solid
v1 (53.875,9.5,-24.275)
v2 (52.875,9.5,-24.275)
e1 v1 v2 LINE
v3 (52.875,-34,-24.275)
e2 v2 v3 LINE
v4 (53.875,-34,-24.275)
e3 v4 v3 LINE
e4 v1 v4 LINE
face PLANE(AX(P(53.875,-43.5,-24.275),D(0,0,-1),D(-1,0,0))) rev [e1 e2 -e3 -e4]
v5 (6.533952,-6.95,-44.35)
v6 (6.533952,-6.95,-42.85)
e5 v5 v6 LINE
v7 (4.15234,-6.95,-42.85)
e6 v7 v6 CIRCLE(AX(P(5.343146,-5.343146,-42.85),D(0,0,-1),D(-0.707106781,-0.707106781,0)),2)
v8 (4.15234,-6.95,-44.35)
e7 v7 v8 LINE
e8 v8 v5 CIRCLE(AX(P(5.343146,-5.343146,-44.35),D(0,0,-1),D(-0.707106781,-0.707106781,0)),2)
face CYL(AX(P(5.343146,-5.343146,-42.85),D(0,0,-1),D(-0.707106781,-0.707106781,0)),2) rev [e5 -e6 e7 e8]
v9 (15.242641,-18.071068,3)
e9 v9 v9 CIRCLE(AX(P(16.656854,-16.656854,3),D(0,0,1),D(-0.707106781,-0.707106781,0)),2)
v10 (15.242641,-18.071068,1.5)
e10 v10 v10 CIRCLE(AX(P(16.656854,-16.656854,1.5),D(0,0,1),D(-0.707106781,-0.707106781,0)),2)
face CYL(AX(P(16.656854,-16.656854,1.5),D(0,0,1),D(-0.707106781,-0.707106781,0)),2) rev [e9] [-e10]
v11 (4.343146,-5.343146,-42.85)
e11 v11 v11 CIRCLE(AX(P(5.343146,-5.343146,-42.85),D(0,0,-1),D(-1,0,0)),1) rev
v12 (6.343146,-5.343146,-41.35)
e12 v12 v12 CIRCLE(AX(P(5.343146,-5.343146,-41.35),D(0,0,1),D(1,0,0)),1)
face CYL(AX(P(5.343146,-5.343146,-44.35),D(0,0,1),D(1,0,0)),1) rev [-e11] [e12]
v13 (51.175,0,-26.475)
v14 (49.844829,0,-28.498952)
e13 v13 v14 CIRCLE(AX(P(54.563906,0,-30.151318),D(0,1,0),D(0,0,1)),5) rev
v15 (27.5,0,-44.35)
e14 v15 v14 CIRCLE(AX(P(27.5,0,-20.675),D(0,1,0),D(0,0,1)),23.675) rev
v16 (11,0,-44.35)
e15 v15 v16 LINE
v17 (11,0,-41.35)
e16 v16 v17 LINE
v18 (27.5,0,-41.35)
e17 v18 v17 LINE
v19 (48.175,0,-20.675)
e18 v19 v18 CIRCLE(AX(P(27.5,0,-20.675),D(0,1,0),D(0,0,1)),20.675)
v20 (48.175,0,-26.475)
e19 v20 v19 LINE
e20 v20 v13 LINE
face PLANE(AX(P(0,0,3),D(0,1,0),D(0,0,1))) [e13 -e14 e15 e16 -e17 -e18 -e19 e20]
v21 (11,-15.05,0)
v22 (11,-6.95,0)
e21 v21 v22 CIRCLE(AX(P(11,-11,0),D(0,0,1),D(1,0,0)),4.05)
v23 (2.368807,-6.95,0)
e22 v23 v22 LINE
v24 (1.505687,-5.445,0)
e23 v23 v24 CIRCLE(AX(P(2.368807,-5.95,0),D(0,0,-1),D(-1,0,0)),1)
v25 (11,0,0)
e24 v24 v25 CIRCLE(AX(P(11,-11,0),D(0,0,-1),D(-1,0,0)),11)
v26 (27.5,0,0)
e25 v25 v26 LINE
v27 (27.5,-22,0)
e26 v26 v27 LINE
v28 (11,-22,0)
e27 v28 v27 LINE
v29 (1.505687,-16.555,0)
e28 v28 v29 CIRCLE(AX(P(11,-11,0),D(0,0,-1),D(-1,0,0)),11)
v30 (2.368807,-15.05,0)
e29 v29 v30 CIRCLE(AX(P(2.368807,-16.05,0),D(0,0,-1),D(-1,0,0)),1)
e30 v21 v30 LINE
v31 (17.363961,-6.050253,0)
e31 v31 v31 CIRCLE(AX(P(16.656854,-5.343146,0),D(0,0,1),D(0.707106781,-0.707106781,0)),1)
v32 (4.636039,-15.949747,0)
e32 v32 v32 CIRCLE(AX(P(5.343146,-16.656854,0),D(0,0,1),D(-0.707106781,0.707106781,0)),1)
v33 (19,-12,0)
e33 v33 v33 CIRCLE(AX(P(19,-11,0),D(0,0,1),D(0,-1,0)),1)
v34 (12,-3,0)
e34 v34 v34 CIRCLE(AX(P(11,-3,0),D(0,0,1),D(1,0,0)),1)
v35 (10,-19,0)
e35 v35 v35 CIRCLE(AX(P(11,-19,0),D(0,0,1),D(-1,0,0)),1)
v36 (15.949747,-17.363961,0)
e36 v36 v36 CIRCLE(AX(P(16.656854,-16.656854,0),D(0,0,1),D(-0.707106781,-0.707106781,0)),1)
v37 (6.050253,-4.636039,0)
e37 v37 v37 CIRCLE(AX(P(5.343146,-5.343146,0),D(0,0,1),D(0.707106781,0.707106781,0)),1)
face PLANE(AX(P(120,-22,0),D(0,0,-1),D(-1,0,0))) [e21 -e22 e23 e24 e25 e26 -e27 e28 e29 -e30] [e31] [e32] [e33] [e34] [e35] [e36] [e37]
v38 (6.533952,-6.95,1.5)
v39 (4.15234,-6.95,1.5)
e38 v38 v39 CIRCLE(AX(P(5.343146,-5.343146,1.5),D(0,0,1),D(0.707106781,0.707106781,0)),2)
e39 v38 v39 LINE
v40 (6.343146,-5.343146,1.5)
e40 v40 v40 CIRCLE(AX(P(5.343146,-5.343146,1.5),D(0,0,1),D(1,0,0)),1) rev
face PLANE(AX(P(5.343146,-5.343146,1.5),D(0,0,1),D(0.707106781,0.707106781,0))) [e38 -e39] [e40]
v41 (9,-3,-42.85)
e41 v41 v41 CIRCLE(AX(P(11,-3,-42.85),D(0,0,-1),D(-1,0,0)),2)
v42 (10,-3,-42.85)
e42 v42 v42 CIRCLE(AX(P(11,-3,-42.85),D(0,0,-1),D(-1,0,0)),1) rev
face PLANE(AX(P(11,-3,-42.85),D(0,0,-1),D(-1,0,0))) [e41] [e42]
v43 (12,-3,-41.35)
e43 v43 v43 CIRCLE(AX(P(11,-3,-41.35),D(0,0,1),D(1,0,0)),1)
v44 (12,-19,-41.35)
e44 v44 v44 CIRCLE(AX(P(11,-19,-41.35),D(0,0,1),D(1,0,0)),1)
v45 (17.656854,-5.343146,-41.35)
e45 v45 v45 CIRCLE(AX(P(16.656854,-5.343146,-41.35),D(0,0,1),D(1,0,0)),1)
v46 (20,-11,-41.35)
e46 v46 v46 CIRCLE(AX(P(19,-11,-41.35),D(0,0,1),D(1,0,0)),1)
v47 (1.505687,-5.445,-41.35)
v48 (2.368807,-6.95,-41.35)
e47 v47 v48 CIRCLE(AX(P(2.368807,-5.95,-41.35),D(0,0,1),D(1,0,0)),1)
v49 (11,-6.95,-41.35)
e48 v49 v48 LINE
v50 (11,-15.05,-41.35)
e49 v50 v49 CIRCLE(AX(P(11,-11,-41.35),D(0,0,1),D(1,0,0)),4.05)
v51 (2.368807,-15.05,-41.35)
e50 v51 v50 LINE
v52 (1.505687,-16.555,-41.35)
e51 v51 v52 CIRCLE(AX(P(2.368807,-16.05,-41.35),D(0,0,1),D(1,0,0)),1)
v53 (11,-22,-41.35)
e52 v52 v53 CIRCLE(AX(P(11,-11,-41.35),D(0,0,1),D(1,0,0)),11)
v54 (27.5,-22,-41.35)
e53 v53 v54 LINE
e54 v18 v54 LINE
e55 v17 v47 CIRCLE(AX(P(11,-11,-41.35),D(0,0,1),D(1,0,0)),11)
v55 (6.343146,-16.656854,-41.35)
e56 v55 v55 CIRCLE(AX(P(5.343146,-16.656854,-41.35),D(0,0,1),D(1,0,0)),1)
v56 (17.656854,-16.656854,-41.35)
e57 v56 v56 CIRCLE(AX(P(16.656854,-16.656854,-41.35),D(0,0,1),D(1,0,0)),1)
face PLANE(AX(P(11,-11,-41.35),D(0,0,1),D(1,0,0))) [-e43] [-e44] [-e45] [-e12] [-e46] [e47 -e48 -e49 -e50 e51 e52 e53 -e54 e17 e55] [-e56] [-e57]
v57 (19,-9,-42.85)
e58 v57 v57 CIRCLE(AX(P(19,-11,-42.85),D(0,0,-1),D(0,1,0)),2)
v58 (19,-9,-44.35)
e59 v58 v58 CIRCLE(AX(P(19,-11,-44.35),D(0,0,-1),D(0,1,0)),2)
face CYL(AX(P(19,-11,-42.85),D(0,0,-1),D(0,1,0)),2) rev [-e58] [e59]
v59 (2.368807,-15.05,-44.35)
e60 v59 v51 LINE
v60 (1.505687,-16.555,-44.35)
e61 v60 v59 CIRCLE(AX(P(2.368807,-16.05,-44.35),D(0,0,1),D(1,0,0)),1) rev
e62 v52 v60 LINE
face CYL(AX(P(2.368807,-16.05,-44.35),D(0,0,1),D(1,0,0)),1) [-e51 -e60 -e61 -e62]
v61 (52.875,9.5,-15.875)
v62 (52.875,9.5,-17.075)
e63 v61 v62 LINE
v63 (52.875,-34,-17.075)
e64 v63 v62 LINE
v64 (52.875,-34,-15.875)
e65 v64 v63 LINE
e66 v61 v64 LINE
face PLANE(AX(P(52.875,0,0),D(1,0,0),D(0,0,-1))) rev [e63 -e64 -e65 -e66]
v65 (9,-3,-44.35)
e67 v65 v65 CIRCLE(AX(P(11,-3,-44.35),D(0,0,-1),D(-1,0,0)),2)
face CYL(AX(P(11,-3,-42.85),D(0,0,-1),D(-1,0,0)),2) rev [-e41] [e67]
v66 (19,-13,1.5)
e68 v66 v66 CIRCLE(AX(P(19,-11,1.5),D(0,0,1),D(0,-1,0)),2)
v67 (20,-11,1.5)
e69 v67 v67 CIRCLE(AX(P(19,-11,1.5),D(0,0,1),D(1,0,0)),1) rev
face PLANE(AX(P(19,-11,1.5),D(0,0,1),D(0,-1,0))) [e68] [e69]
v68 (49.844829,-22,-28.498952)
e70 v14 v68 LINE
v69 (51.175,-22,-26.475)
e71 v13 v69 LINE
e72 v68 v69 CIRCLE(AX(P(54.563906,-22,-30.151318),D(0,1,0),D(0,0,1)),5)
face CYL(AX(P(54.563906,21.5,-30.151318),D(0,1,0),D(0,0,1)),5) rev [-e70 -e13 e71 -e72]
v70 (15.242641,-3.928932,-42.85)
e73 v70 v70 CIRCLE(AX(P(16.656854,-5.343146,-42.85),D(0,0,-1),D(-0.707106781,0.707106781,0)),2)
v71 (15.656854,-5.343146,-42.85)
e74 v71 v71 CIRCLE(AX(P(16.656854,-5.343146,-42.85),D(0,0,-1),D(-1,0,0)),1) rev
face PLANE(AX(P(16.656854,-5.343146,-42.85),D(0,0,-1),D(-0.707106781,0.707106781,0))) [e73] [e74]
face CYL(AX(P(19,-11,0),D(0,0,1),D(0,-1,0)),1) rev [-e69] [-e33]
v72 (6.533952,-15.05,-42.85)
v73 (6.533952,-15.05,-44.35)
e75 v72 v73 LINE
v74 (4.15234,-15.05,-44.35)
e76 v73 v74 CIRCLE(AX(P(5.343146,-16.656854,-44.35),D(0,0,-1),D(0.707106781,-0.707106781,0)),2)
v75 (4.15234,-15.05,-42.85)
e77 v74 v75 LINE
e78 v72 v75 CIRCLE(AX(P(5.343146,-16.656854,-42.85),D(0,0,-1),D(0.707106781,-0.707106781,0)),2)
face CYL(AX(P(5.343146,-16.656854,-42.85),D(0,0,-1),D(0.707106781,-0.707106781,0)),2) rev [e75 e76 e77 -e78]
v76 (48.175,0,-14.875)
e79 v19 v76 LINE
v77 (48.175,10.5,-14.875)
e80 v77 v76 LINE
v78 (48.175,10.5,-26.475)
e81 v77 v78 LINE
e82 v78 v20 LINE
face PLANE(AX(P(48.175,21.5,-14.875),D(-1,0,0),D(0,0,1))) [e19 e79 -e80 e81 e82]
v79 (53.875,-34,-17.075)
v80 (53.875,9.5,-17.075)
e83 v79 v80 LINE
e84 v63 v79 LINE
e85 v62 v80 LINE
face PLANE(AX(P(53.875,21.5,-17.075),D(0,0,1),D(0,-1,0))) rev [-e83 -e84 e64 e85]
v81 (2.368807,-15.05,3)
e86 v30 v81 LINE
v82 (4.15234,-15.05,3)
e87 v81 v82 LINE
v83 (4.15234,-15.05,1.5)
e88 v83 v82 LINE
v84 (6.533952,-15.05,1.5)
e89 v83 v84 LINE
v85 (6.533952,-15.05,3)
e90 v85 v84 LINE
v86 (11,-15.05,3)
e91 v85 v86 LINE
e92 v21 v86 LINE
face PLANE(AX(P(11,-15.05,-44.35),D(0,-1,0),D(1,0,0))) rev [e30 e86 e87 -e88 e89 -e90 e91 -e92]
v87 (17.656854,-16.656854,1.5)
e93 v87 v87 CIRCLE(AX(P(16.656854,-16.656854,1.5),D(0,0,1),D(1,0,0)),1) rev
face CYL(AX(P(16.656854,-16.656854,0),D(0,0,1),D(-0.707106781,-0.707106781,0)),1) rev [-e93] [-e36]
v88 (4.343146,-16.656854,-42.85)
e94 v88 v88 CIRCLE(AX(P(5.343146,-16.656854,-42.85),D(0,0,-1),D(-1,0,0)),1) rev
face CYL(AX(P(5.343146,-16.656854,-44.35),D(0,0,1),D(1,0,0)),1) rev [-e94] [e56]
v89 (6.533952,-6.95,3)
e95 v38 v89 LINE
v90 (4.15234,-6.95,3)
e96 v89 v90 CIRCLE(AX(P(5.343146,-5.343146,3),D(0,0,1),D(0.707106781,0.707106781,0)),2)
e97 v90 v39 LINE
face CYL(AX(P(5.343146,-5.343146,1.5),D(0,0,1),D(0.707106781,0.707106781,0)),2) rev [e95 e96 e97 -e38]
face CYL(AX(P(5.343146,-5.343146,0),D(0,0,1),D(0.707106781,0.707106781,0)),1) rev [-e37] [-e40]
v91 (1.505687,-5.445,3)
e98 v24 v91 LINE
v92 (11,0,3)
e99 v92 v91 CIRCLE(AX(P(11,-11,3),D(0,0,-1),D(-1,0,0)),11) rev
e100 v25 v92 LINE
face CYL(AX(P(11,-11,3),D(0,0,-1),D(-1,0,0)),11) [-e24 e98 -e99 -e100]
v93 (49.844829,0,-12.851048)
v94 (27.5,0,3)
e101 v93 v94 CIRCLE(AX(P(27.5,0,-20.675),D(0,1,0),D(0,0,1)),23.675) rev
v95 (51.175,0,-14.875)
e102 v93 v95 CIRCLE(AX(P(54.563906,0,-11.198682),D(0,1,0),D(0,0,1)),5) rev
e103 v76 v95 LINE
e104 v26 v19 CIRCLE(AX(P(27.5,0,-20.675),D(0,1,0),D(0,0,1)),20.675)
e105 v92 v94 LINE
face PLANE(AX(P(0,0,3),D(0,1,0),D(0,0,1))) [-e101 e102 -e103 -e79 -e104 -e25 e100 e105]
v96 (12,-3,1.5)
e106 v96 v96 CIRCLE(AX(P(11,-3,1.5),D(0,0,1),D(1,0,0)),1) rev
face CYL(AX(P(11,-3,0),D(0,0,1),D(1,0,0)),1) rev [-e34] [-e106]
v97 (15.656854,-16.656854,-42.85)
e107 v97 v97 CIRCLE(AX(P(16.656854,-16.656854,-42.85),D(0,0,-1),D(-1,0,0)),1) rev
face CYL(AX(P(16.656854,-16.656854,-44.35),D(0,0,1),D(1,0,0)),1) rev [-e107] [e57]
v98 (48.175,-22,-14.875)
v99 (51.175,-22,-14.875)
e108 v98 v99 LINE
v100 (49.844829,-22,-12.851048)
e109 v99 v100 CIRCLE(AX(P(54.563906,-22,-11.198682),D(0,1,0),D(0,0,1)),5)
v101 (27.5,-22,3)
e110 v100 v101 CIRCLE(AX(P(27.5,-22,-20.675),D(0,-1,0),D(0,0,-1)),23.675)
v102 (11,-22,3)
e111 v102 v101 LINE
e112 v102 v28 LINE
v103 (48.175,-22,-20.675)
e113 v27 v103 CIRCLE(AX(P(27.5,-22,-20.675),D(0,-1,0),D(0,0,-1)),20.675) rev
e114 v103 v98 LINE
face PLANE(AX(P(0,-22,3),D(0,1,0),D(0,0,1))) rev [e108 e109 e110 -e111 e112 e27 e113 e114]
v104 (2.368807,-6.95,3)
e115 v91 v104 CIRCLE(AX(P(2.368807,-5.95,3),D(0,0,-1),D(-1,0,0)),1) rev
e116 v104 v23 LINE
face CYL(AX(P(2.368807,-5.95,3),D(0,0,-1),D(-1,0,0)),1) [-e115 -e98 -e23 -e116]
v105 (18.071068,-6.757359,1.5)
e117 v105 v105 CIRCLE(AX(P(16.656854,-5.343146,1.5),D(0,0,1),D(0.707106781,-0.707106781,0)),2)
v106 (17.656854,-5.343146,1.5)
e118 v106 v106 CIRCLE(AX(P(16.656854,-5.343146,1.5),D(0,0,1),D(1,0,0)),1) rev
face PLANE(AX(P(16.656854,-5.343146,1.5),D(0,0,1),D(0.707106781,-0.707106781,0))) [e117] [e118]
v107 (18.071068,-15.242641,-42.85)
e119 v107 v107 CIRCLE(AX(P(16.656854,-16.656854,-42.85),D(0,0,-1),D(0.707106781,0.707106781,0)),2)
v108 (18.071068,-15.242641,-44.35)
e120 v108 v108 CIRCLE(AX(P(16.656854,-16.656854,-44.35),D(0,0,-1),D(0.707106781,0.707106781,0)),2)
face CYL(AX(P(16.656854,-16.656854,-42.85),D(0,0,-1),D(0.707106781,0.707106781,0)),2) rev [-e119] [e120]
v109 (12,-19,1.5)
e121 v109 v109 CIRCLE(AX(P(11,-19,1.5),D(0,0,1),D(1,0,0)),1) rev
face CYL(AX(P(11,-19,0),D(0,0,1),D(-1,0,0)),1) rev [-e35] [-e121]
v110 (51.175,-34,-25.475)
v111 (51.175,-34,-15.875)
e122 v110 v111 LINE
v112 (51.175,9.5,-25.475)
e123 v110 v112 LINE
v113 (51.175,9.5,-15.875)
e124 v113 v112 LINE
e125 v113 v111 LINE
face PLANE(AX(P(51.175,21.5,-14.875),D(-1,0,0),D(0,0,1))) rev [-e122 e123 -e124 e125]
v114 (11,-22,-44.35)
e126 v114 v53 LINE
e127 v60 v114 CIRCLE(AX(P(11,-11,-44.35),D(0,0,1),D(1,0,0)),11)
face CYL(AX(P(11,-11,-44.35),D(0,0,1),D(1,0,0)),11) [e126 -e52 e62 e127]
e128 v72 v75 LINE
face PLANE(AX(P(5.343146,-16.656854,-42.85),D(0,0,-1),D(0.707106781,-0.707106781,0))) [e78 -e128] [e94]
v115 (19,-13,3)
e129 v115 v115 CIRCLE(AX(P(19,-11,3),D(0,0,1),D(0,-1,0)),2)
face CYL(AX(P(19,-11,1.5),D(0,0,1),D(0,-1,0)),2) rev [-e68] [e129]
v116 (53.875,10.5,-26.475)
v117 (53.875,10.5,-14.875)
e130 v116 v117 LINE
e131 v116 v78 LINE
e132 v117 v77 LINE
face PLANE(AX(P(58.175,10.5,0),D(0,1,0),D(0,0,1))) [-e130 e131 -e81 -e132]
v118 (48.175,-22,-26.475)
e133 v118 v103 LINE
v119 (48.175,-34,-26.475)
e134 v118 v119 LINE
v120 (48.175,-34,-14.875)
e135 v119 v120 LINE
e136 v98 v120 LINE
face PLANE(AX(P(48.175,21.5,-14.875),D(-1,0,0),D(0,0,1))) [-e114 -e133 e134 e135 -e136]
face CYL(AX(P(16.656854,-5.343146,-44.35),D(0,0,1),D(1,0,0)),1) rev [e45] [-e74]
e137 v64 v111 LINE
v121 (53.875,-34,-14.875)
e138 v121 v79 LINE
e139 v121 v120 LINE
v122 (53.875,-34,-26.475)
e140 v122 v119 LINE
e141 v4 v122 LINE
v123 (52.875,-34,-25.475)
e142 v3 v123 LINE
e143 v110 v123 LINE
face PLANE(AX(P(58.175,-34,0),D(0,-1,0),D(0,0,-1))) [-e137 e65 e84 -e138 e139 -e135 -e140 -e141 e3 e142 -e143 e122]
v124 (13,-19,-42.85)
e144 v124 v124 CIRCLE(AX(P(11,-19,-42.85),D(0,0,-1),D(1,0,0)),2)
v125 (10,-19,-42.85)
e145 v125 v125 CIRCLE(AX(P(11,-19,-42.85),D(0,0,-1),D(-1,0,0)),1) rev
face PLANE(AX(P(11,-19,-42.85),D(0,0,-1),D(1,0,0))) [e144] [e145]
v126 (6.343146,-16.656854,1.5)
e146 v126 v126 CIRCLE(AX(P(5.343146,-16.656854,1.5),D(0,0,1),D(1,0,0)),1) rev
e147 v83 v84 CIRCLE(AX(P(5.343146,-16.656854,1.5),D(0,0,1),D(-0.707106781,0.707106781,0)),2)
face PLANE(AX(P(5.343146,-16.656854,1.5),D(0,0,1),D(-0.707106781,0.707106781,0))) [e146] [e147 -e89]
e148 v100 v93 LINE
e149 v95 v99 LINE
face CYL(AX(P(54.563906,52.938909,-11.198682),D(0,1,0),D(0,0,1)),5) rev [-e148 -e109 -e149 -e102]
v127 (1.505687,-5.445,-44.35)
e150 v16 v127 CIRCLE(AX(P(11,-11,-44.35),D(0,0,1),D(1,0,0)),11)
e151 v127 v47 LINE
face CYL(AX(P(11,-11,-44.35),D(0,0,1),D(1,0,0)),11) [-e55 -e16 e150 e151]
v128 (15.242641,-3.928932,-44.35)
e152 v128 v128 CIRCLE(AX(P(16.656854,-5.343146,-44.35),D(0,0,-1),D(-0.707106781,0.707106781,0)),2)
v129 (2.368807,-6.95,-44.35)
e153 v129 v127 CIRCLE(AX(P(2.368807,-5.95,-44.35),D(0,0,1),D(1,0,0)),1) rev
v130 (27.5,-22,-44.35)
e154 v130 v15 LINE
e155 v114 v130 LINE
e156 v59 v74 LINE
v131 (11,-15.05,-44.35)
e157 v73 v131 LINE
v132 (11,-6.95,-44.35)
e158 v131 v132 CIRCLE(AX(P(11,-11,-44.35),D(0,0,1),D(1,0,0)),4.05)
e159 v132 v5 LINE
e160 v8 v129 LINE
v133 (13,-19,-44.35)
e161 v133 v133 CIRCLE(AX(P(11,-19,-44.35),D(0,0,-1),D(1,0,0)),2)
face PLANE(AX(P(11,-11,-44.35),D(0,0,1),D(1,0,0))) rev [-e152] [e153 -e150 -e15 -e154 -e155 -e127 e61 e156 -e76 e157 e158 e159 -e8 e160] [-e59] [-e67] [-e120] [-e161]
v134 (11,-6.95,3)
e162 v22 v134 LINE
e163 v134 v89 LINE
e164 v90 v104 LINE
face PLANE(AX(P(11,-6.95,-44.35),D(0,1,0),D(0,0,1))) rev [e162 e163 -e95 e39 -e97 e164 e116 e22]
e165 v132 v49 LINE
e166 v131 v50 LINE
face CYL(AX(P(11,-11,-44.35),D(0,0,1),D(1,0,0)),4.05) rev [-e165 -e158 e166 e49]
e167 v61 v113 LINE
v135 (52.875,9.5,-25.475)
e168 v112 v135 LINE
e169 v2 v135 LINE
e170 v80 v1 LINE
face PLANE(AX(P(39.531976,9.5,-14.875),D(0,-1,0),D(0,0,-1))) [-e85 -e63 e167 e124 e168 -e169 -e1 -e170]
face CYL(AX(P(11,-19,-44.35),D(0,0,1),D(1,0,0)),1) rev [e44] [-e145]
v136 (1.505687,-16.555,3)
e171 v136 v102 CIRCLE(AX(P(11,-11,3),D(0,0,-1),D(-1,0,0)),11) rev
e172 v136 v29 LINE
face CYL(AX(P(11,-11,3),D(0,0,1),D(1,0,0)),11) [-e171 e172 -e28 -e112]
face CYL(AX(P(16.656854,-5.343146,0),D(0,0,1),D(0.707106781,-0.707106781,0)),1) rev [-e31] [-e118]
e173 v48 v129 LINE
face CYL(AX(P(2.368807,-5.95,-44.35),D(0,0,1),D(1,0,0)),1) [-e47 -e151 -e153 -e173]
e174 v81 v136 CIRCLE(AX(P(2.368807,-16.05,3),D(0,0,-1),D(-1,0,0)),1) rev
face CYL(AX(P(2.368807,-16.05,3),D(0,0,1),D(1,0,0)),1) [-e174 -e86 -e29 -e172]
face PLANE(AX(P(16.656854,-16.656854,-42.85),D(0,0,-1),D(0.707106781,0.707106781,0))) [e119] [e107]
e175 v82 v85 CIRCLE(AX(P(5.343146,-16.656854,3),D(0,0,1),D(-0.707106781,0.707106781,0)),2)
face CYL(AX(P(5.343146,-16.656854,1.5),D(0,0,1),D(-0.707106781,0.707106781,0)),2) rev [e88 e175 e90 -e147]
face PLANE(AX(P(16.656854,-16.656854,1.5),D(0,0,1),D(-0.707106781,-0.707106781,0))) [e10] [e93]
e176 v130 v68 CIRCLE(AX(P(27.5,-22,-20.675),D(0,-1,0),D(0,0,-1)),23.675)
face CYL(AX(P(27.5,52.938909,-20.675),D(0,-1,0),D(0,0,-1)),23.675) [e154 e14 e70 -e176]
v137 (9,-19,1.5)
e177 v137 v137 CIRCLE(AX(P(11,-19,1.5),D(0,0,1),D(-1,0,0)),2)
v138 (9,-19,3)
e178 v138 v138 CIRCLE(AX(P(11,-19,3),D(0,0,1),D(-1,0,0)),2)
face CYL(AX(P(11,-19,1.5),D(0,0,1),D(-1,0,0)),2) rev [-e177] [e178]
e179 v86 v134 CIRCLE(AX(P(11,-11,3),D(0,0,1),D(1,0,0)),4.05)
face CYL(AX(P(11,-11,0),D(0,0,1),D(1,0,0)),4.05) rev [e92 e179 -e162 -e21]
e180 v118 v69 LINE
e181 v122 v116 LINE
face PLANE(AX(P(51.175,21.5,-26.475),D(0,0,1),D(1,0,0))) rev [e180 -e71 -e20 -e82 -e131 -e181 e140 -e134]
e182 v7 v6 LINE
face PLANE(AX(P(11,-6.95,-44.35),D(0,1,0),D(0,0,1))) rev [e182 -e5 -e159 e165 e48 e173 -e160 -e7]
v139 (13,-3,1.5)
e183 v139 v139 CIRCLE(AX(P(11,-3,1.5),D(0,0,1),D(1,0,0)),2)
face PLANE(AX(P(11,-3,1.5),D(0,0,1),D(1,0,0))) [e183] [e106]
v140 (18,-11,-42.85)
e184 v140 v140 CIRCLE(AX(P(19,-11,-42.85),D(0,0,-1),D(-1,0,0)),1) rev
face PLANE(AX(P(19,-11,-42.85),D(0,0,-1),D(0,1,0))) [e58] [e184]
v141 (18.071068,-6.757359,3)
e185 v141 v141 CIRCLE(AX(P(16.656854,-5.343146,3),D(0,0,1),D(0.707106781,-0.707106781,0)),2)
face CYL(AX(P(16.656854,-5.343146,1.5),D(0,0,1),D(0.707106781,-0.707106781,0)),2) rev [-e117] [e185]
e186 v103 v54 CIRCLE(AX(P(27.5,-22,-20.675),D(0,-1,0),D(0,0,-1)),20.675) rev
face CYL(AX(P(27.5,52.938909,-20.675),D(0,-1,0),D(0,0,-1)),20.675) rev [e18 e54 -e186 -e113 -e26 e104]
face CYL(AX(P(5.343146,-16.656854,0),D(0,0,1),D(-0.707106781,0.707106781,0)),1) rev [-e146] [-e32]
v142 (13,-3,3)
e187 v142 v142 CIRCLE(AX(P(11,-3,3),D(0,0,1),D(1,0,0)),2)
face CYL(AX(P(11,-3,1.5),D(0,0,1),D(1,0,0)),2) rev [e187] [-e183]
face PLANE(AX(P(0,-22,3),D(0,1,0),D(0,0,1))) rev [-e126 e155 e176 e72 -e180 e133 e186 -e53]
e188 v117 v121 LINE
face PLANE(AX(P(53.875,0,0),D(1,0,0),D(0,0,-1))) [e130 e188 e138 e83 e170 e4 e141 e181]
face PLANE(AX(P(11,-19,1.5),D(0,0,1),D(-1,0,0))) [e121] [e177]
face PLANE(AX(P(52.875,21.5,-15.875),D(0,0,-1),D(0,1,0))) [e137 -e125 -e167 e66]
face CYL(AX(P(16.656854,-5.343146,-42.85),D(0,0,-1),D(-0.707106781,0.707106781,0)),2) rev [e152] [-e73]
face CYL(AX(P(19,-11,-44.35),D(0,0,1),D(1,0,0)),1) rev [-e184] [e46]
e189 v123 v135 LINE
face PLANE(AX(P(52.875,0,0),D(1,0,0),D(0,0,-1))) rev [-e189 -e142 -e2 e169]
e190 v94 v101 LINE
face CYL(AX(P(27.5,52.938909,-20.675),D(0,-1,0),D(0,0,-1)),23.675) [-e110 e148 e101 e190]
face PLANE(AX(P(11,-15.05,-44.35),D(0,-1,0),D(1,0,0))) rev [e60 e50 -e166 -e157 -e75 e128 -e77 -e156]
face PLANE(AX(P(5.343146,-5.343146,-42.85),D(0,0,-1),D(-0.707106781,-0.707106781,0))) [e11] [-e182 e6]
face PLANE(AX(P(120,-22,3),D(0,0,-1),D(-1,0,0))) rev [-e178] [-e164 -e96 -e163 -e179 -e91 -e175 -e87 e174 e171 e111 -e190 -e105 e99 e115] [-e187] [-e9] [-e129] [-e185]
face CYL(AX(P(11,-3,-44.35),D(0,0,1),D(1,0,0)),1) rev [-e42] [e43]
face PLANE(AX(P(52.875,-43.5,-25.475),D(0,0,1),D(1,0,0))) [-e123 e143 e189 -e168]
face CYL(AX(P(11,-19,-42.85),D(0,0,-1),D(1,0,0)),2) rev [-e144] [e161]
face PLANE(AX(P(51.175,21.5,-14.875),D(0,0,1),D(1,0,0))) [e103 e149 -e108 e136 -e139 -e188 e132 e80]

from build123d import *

# Parameters (mm, degrees)
SKETCH1_W                 = 120
SKETCH1_H                 = 22
EXTRUDE_THIN1_DEPTH       = 3
SKETCH2_R                 = 4.05
CUT_EXTRUDE1_DEPTH        = 123.036879672
FILLET2_R                 = 11
SKETCH5_R                 = 1
CUT_EXTRUDE3_DEPTH        = 123.036879672
CIRPATTERN1_COUNT         = 8
SKETCH10_R                = 2
CUT_EXTRUDE5_DEPTH        = 1.5
CIRPATTERN3_COUNT         = 8
SKETCH11_R                = 4.05
SKETCH11_R_2              = 1
BOSS_EXTRUDE1_DEPTH       = 3
CUT_EXTRUDE6_START        = -1.5
SKETCH12_R                = 2
CUT_EXTRUDE6_DEPTH        = 1.5
CIRPATTERN4_COUNT         = 8
SKETCH13_W                = 5
SKETCH13_H                = 22
BOSS_EXTRUDE2_DEPTH       = 41.35
CUT_EXTRUDE7_START        = -1
CUT_EXTRUDE7_DEPTH        = 12
FILLET4_R                 = 1
SKETCH20_W                = 10
SKETCH20_H                = 36
BOSS_EXTRUDE3_DEPTH       = 2
BOSS_EXTRUDE4_DEPTH       = 3
SKETCH24_W                = 10
SKETCH24_H                = 5.5
BOSS_EXTRUDE5_DEPTH       = 3
SKETCH25_W                = 10
SKETCH25_H                = 5.5
BOSS_EXTRUDE6_DEPTH       = 2.85
SKETCH22_R                = 1.35
CUT_EXTRUDE9_DEPTH        = 132.178971257
FILLET6_R                 = 2
FILLET7_R                 = 10
SKETCH29_W                = 10
SKETCH29_H                = 1.7
BOSS_EXTRUDE7_DEPTH       = 3
SKETCH30_W                = 10
SKETCH30_H                = 1.7
BOSS_EXTRUDE8_DEPTH       = 3
FILLET8_R                 = 3
FILLET9_R                 = 3
CUT_EXTRUDE10_REACH       = 134.223
SKETCH31_R                = 1.143
CUT_EXTRUDE11_DEPTH       = 10
CUT_EXTRUDE11_DEPTH_BACK  = 30
SKETCH32_W                = 86.5
SKETCH32_H                = 47.35
SKETCH38_W                = 6
SKETCH38_H                = 47.35
CUT_EXTRUDE19_DEPTH       = 35
BOSS_EXTRUDE11_DEPTH      = 22
BOSS_EXTRUDE12_DEPTH      = 21.5
BOSS_EXTRUDE12_DEPTH_BACK = 43.5
SKETCH39_W                = 3
SKETCH39_H                = 11.6
FILLET10_R                = 5
SKETCH40_W                = 1
SKETCH40_H                = 65
BOSS_EXTRUDE13_DEPTH      = 1.7
SKETCH42_W                = 2.2
SKETCH42_H                = 65
BOSS_EXTRUDE14_DEPTH      = 1
SKETCH43_W                = 1.7
SKETCH43_H                = 9.6
BOSS_EXTRUDE15_DEPTH      = 1.15
SKETCH44_W                = 1
SKETCH44_H                = 7.2
BOSS_EXTRUDE16_DEPTH      = 2.09
SKETCH46_W                = 11.6
SKETCH46_H                = 11
SKETCH46_H_2              = 9.5
CUT_EXTRUDE20_DEPTH       = 10
BOSS_EXTRUDE17_REACH      = 78.68
SKETCH48_W                = 11.6
SKETCH48_H                = 1


with BuildPart() as part:
    # Sketch1 → Extrude-Thin1 (new body)
    with BuildSketch(Plane.XY):
        with Locations((60, -11)):
            Rectangle(SKETCH1_W, SKETCH1_H)
    extrude(amount=EXTRUDE_THIN1_DEPTH)

    # Sketch2 → Cut-Extrude1 (cut, through all)
    with BuildSketch(Plane.XY.offset(3)):
        with Locations((11, -11)):
            Circle(SKETCH2_R)
    extrude(amount=-CUT_EXTRUDE1_DEPTH, mode=Mode.SUBTRACT)

    # Fillet2
    fillet2_edges = [part.edges().sort_by_distance(p)[0] for p in [
        (0, -22, 1.5),
        (0, 0, 1.5),
    ]]
    fillet(fillet2_edges, radius=FILLET2_R - 0.0001)  # a hair under: the kernel refuses the full size

    # Sketch5 → Cut-Extrude3 (cut, through all)
    with BuildSketch(Plane.XY.offset(3)):
        with Locations((11, -3)):
            Circle(SKETCH5_R)
    cut_extrude3 = extrude(amount=-CUT_EXTRUDE3_DEPTH, mode=Mode.SUBTRACT)

    # CirPattern1: Cut-Extrude3 ×8 about axis
    cirpattern1_axis = Axis((11, -11, 0), (0, 0, 1))
    for i in range(1, CIRPATTERN1_COUNT):
        add(cut_extrude3.rotate(cirpattern1_axis, i * 360 / CIRPATTERN1_COUNT), mode=Mode.SUBTRACT)

    # Sketch10 → Cut-Extrude5 (cut)
    with BuildSketch(Plane.XY.offset(3)):
        with Locations((11, -3)):
            Circle(SKETCH10_R)
    cut_extrude5 = extrude(amount=-CUT_EXTRUDE5_DEPTH, mode=Mode.SUBTRACT)

    # CirPattern3: Cut-Extrude5 ×8 about axis
    cirpattern3_axis = Axis((11, -11, 0), (0, 0, 1))
    for i in range(1, CIRPATTERN3_COUNT):
        add(cut_extrude5.rotate(cirpattern3_axis, i * 360 / CIRPATTERN3_COUNT), mode=Mode.SUBTRACT)



with BuildPart() as body_2:
    # Sketch11 → Boss-Extrude1 (new body)
    with BuildSketch(Plane.XY.offset(-41.35)):
        with BuildLine():
            Line((11, 0), (120, 0))
            Line((120, 0), (120, -22))
            Line((120, -22), (11, -22))
            ThreePointArc((11, -22), (3.221825407, -18.778174593), (0, -11))
            ThreePointArc((0, -11), (3.221825407, -3.221825407), (11, 0))
        make_face()
        with Locations((11, -11)):
            Circle(SKETCH11_R, mode=Mode.SUBTRACT)
        with Locations((11, -3)):
            Circle(SKETCH11_R_2, mode=Mode.SUBTRACT)
        with Locations(Location((5.343145751, -5.343145751, 0), (0, 0, 45))):
            Circle(SKETCH11_R_2, mode=Mode.SUBTRACT)
        with Locations(Location((3, -11, 0), (0, 0, 90))):
            Circle(SKETCH11_R_2, mode=Mode.SUBTRACT)
        with Locations(Location((5.343145751, -16.656854249, 0), (0, 0, 135))):
            Circle(SKETCH11_R_2, mode=Mode.SUBTRACT)
        with Locations(Location((11, -19, 0), (0, 0, 180))):
            Circle(SKETCH11_R_2, mode=Mode.SUBTRACT)
        with Locations(Location((16.656854249, -16.656854249, 0), (0, 0, 225))):
            Circle(SKETCH11_R_2, mode=Mode.SUBTRACT)
        with Locations(Location((16.656854249, -5.343145751, 0), (0, 0, 315))):
            Circle(SKETCH11_R_2, mode=Mode.SUBTRACT)
        with Locations(Location((19, -11, 0), (0, 0, 270))):
            Circle(SKETCH11_R_2, mode=Mode.SUBTRACT)
    extrude(amount=-BOSS_EXTRUDE1_DEPTH)

    # Sketch12 → Cut-Extrude6 (cut)
    with BuildSketch(Plane(origin=(0, 0, -44.35), x_dir=(-1, 0, 0), z_dir=(0, 0, -1)).offset(CUT_EXTRUDE6_START)):
        with Locations(Location((-11, -3, 0), (0, 0, 180))):
            Circle(SKETCH12_R)
    cut_extrude6 = extrude(amount=CUT_EXTRUDE6_DEPTH, mode=Mode.SUBTRACT)

    # CirPattern4: Cut-Extrude6 ×8 about axis
    cirpattern4_axis = Axis((11, -11, 0), (0, 0, 1))
    for i in range(1, CIRPATTERN4_COUNT):
        add(cut_extrude6.rotate(cirpattern4_axis, i * 360 / CIRPATTERN4_COUNT), mode=Mode.SUBTRACT)


with BuildPart() as part_1:
    add(part.part)

    add(body_2.part)  # Boss-Extrude2 merges body 2
    # Sketch13 → Boss-Extrude2 (add)
    with BuildSketch(Plane(origin=(0, 0, 0), x_dir=(-1, 0, 0), z_dir=(0, 0, -1))):
        with Locations((-62.5, -11)):
            Rectangle(SKETCH13_W, SKETCH13_H)
    extrude(amount=BOSS_EXTRUDE2_DEPTH)

    # Cut-Extrude7: read off the stored shape, not the designer's step
    # Cut-Extrude7 outline → Cut-Extrude7 (cut)
    with BuildSketch(Plane.YZ.offset(CUT_EXTRUDE7_START)):
        Polygon((-6.95, -41.35), (-15.05, -41.35), (-15.05, -42.85), (-15.05, -44.35), (-6.95, -44.35), (-6.95, -42.85), align=None)
        Polygon((-6.95, 3), (-15.05, 3), (-15.05, 1.5), (-15.05, 0), (-6.95, 0), (-6.95, 1.5), align=None)
    extrude(amount=CUT_EXTRUDE7_DEPTH, mode=Mode.SUBTRACT)

    # Fillet4
    fillet4_edges = [part_1.edges().sort_by_distance(p)[0] for p in [
        (0.772676036, -15.05, 1.5),
        (0.772676036, -6.95, 1.5),
        (0.772708081, -6.95, -42.85),
        (0.772708081, -15.05, -42.85),
    ]]
    fillet(fillet4_edges, radius=FILLET4_R)

    # Sketch20 → Boss-Extrude3 (add)
    with BuildSketch(Plane.XY.offset(-41.35)):
        with Locations((115, -11)):
            Rectangle(SKETCH20_W, SKETCH20_H)
    extrude(amount=BOSS_EXTRUDE3_DEPTH)

    # Sketch21 → Boss-Extrude4 (add)
    with BuildSketch(Plane(origin=(0, 0, 0), x_dir=(-1, 0, 0), z_dir=(0, 0, -1))):
        Polygon((-120, -22), (-120, 0), (-120, 7), (-110, 7), (-110, 0), (-110, -22), (-110, -29), (-120, -29), align=None)
    extrude(amount=BOSS_EXTRUDE4_DEPTH)

    # Sketch24 → Boss-Extrude5 (add)
    with BuildSketch(Plane(origin=(0, 0, -3), x_dir=(-1, 0, 0), z_dir=(0, 0, -1))):
        with Locations((-115, 4.25)):
            Rectangle(SKETCH24_W, SKETCH24_H)
        with Locations((-115, -26.25)):
            Rectangle(SKETCH24_W, SKETCH24_H)
    extrude(amount=BOSS_EXTRUDE5_DEPTH)

    # Sketch25 → Boss-Extrude6 (add)
    with BuildSketch(Plane.XY.offset(-39.35)):
        with Locations((115, 4.25)):
            Rectangle(SKETCH25_W, SKETCH25_H)
        with Locations((115, -26.25)):
            Rectangle(SKETCH25_W, SKETCH25_H)
    extrude(amount=BOSS_EXTRUDE6_DEPTH)

    # Sketch22 → Cut-Extrude9 (cut, through all)
    with BuildSketch(Plane(origin=(0, 0, -41.35), x_dir=(-1, 0, 0), z_dir=(0, 0, -1))):
        with Locations((-114.967399898, 4)):
            Circle(SKETCH22_R)
        with Locations((-114.967399898, -26)):
            Circle(SKETCH22_R)
    extrude(amount=-CUT_EXTRUDE9_DEPTH, mode=Mode.SUBTRACT)

    # Fillet6
    fillet6_edges = [part_1.edges().sort_by_distance(p)[0] for p in [
        (110, 7, -38.925),
        (110, -29, -38.925),
        (120, -29, -38.925),
        (120, 7, -38.925),
        (120, -29, -3),
        (110, -29, -3),
        (110, 7, -3),
        (120, 7, -3),
    ]]
    fillet(fillet6_edges, radius=FILLET6_R)

    # Fillet7
    # the kernel refuses this fillet: 10 mm, written as the material it adds along each edge
    with BuildSketch(Plane(origin=(110, -22, 0), x_dir=(-1, 0, 0), z_dir=(0, 1, 0))) as fillet7_piece_1:
        with BuildLine():
            CenterArc((7.141428429, -10), FILLET7_R, 90, 45.572995999)
            Line((0, -3), (0, 0))
            Line((0, 0), (7.141428429, 0))
        make_face()
    extrude(amount=22)
    with BuildSketch(Plane(origin=(110, -22, -41.35), x_dir=(0, 0, 1), z_dir=(0, 1, 0))) as fillet7_piece_2:
        with BuildLine():
            CenterArc((10, -6), FILLET7_R, 143.130102354, 36.869897646)
            Line((0, -6), (0, 0))
            Line((0, 0), (2, 0))
        make_face()
    extrude(amount=22)

    # Sketch29 → Boss-Extrude7 (add)
    with BuildSketch(Plane(origin=(0, 0, -41.35), x_dir=(-1, 0, 0), z_dir=(0, 0, -1))):
        with Locations((-115, 0.85)):
            Rectangle(SKETCH29_W, SKETCH29_H)
        with Locations((-115, -22.85)):
            Rectangle(SKETCH29_W, SKETCH29_H)
    extrude(amount=BOSS_EXTRUDE7_DEPTH)

    # Sketch30 → Boss-Extrude8 (add)
    with BuildSketch(Plane.XY):
        with Locations((115, 0.85)):
            Rectangle(SKETCH30_W, SKETCH30_H)
        with Locations((115, -22.85)):
            Rectangle(SKETCH30_W, SKETCH30_H)
    extrude(amount=BOSS_EXTRUDE8_DEPTH)

    # Fillet8
    # the kernel refuses this fillet: 3 mm, written as the material it adds along each edge
    with BuildSketch(Plane(origin=(110, 0, 3), x_dir=(-1, 0, 0), z_dir=(0, 0, -1))) as fillet8_piece_1_section:
        with BuildLine():
            CenterArc((FILLET8_R, FILLET8_R), FILLET8_R, 180, 90)
            Line((0, FILLET8_R), (0, 0))
            Line((0, 0), (FILLET8_R, 0))
        make_face()
    fillet8_piece_1 = extrude(amount=13.5, mode=Mode.PRIVATE)
    fillet8_piece_1 = split(fillet8_piece_1, bisect_by=Plane(origin=(110, 1.7, 3), z_dir=(0, -1, 0)), keep=Keep.TOP, mode=Mode.PRIVATE)
    fillet8_piece_1 = fillet8_piece_1 - Plane(origin=(102.858571571, 0, -10), x_dir=(-1, 0, 0), z_dir=(0, -1, 0)) * Cylinder(10, 39, mode=Mode.PRIVATE)
    add(fillet8_piece_1)
    with BuildSketch(Plane(origin=(110, 0, 10.5), x_dir=(-1, 0, 0), z_dir=(0, 0, -1))) as fillet8_piece_2_section:
        with BuildLine():
            CenterArc((FILLET8_R, FILLET8_R), FILLET8_R, 180, 90)
            Line((0, FILLET8_R), (0, 0))
            Line((0, 0), (FILLET8_R, 0))
        make_face()
    fillet8_piece_2 = extrude(amount=21, mode=Mode.PRIVATE)
    fillet8_piece_2 = split(fillet8_piece_2, bisect_by=Plane(origin=(110, 1.5, 10.5), z_dir=(0, 1, 0)), keep=Keep.TOP, mode=Mode.PRIVATE)
    fillet8_piece_2 = split(fillet8_piece_2, bisect_by=Plane(origin=(110, 0, -6), z_dir=(0, 0, 1)), keep=Keep.TOP, mode=Mode.PRIVATE)
    fillet8_piece_2 = split(fillet8_piece_2, bisect_by=Plane(origin=(110, 0, 0), z_dir=(0, 0, -1)), keep=Keep.TOP, mode=Mode.PRIVATE)
    add(fillet8_piece_2)

    # Fillet9
    # the kernel refuses this fillet: 3 mm, written as the material it adds along each edge
    with BuildSketch(Plane(origin=(110, -22, -10.5), x_dir=(-1, 0, 0), z_dir=(0, 0, 1))) as fillet9_piece_1_section:
        with BuildLine():
            CenterArc((FILLET9_R, FILLET9_R), FILLET9_R, 180, 90)
            Line((0, FILLET9_R), (0, 0))
            Line((0, 0), (FILLET9_R, 0))
        make_face()
    fillet9_piece_1 = extrude(amount=21, mode=Mode.PRIVATE)
    fillet9_piece_1 = split(fillet9_piece_1, bisect_by=Plane(origin=(110, -22, 0), z_dir=(0, 0, -1)), keep=Keep.TOP, mode=Mode.PRIVATE)
    fillet9_piece_1 = split(fillet9_piece_1, bisect_by=Plane(origin=(110, -22, -6), z_dir=(0, 0, 1)), keep=Keep.TOP, mode=Mode.PRIVATE)
    fillet9_piece_1 = split(fillet9_piece_1, bisect_by=Plane(origin=(110, -23.5, -10.5), z_dir=(0, -1, 0)), keep=Keep.TOP, mode=Mode.PRIVATE)
    add(fillet9_piece_1)
    with BuildSketch(Plane(origin=(110, -22, -10.5), x_dir=(-1, 0, 0), z_dir=(0, 0, 1))) as fillet9_piece_2_section:
        with BuildLine():
            CenterArc((FILLET9_R, FILLET9_R), FILLET9_R, 180, 90)
            Line((0, FILLET9_R), (0, 0))
            Line((0, 0), (FILLET9_R, 0))
        make_face()
    fillet9_piece_2 = extrude(amount=13.5, mode=Mode.PRIVATE)
    fillet9_piece_2 = split(fillet9_piece_2, bisect_by=Plane(origin=(110, -23.7, -10.5), z_dir=(0, 1, 0)), keep=Keep.TOP, mode=Mode.PRIVATE)
    fillet9_piece_2 = fillet9_piece_2 - Plane(origin=(102.858571571, -22, -10), x_dir=(-1, 0, 0), z_dir=(0, -1, 0)) * Cylinder(10, 39, mode=Mode.PRIVATE)
    add(fillet9_piece_2)
    with BuildSketch(Plane(origin=(110, 0, -31.85), x_dir=(-1, 0, 0), z_dir=(0, 0, -1))) as fillet9_piece_3_section:
        with BuildLine():
            CenterArc((FILLET9_R, FILLET9_R), FILLET9_R, 180, 90)
            Line((0, FILLET9_R), (0, 0))
            Line((0, 0), (FILLET9_R, 0))
        make_face()
    fillet9_piece_3 = extrude(amount=20, mode=Mode.PRIVATE)
    fillet9_piece_3 = split(fillet9_piece_3, bisect_by=Plane(origin=(110, 0, -41.35), z_dir=(0, 0, 1)), keep=Keep.TOP, mode=Mode.PRIVATE)
    fillet9_piece_3 = split(fillet9_piece_3, bisect_by=Plane(origin=(110, 0, -36.5), z_dir=(0, 0, -1)), keep=Keep.TOP, mode=Mode.PRIVATE)
    fillet9_piece_3 = split(fillet9_piece_3, bisect_by=Plane(origin=(110, 1.5, -31.85), z_dir=(0, 1, 0)), keep=Keep.TOP, mode=Mode.PRIVATE)
    add(fillet9_piece_3)
    with BuildSketch(Plane(origin=(110, 0, -31.85), x_dir=(-1, 0, 0), z_dir=(0, 0, -1))) as fillet9_piece_4_section:
        with BuildLine():
            CenterArc((FILLET9_R, FILLET9_R), FILLET9_R, 180, 90)
            Line((0, FILLET9_R), (0, 0))
            Line((0, 0), (FILLET9_R, 0))
        make_face()
    fillet9_piece_4 = extrude(amount=12.5, mode=Mode.PRIVATE)
    fillet9_piece_4 = fillet9_piece_4 - Plane(origin=(104, 0, -31.35), x_dir=(0, 0, 1), z_dir=(0, -1, 0)) * Cylinder(10, 38, mode=Mode.PRIVATE)
    fillet9_piece_4 = split(fillet9_piece_4, bisect_by=Plane(origin=(110, 1.7, -31.85), z_dir=(0, -1, 0)), keep=Keep.TOP, mode=Mode.PRIVATE)
    add(fillet9_piece_4)
    with BuildSketch(Plane(origin=(110, -22, -44.35), x_dir=(-1, 0, 0), z_dir=(0, 0, 1))) as fillet9_piece_5_section:
        with BuildLine():
            CenterArc((FILLET9_R, FILLET9_R), FILLET9_R, 180, 90)
            Line((0, FILLET9_R), (0, 0))
            Line((0, 0), (FILLET9_R, 0))
        make_face()
    fillet9_piece_5 = extrude(amount=12.5, mode=Mode.PRIVATE)
    fillet9_piece_5 = fillet9_piece_5 - Plane(origin=(104, -22, -31.35), x_dir=(0, 0, 1), z_dir=(0, -1, 0)) * Cylinder(10, 38, mode=Mode.PRIVATE)
    fillet9_piece_5 = split(fillet9_piece_5, bisect_by=Plane(origin=(110, -23.7, -44.35), z_dir=(0, 1, 0)), keep=Keep.TOP, mode=Mode.PRIVATE)
    add(fillet9_piece_5)
    with BuildSketch(Plane(origin=(110, -22, -51.85), x_dir=(-1, 0, 0), z_dir=(0, 0, 1))) as fillet9_piece_6_section:
        with BuildLine():
            CenterArc((FILLET9_R, FILLET9_R), FILLET9_R, 180, 90)
            Line((0, FILLET9_R), (0, 0))
            Line((0, 0), (FILLET9_R, 0))
        make_face()
    fillet9_piece_6 = extrude(amount=20, mode=Mode.PRIVATE)
    fillet9_piece_6 = split(fillet9_piece_6, bisect_by=Plane(origin=(110, -22, -41.35), z_dir=(0, 0, 1)), keep=Keep.TOP, mode=Mode.PRIVATE)
    fillet9_piece_6 = split(fillet9_piece_6, bisect_by=Plane(origin=(110, -23.5, -51.85), z_dir=(0, -1, 0)), keep=Keep.TOP, mode=Mode.PRIVATE)
    fillet9_piece_6 = split(fillet9_piece_6, bisect_by=Plane(origin=(110, -22, -36.5), z_dir=(0, 0, -1)), keep=Keep.TOP, mode=Mode.PRIVATE)
    add(fillet9_piece_6)

    # Sketch31 → Cut-Extrude10 (cut, up to next)
    with BuildSketch(Plane(origin=(0, 0, -44.35), x_dir=(-1, 0, 0), z_dir=(0, 0, -1)), mode=Mode.PRIVATE) as cut_extrude10_sk1:
        with Locations((-91.23, -11)):
            Circle(SKETCH31_R)
    cut_extrude10_tool1 = extrude(cut_extrude10_sk1.sketch, amount=-CUT_EXTRUDE10_REACH, mode=Mode.PRIVATE) & part_1.part
    # Sketch31 → Cut-Extrude10 (cut, up to next)
    with BuildSketch(Plane(origin=(0, 0, -44.35), x_dir=(-1, 0, 0), z_dir=(0, 0, -1)), mode=Mode.PRIVATE) as cut_extrude10_sk2:
        with Locations((-77.768, -11)):
            Circle(SKETCH31_R)
    cut_extrude10_tool2 = extrude(cut_extrude10_sk2.sketch, amount=-CUT_EXTRUDE10_REACH, mode=Mode.PRIVATE) & part_1.part
    add(cut_extrude10_tool1.solids().sort_by_distance((91.23, -11, -44.35))[0], mode=Mode.SUBTRACT)
    add(cut_extrude10_tool1.solids().sort_by_distance((91.23, -11, -44.35))[1], mode=Mode.SUBTRACT)
    add(cut_extrude10_tool2.solids().sort_by_distance((77.768, -11, -44.35))[0], mode=Mode.SUBTRACT)
    add(cut_extrude10_tool2.solids().sort_by_distance((77.768, -11, -44.35))[1], mode=Mode.SUBTRACT)

    # Sketch32 → Cut-Extrude11 (cut, two sides: drawn at the far end of the back side and taken through both)
    with BuildSketch(Plane.XZ.offset(22).offset(-CUT_EXTRUDE11_DEPTH_BACK)):
        with Locations((76.75, -20.675)):
            Rectangle(SKETCH32_W, SKETCH32_H)
    extrude(amount=CUT_EXTRUDE11_DEPTH + CUT_EXTRUDE11_DEPTH_BACK, mode=Mode.SUBTRACT)


with BuildPart() as cut_extrude11_piece_1:
    # of the separate pieces the step leaves, piece 1, a body of its own (cut_extrude11_pieces)
    add(part_1.part.solids().sort_by_distance((33.5, -22, 0))[0])


with BuildPart() as cut_extrude11_piece_2:
    # of the separate pieces the step leaves, piece 2, a body of its own (cut_extrude11_pieces)
    add(part_1.part.solids().sort_by_distance((33.5, -22, -44.35))[0])


with BuildPart() as cut_extrude19_tool:
    # Sketch38 → Cut-Extrude19 (new body)
    with BuildSketch(Plane(origin=(0, 0, 0), x_dir=(1, 0, 0), z_dir=(0, 1, 0))):
        with Locations((30.5, 20.675)):
            Rectangle(SKETCH38_W, SKETCH38_H)
    extrude(amount=-CUT_EXTRUDE19_DEPTH)


with BuildPart() as cut_extrude11_piece_1_1:
    add(cut_extrude11_piece_1.part)

    # Cut-Extrude19: cut by cut_extrude19_tool
    add(cut_extrude19_tool.part, mode=Mode.SUBTRACT)



with BuildPart() as cut_extrude11_piece_2_1:
    add(cut_extrude11_piece_2.part)

    # Cut-Extrude19: cut by cut_extrude19_tool
    add(cut_extrude19_tool.part, mode=Mode.SUBTRACT)


with BuildPart() as cut_extrude11_piece_1_2:
    add(cut_extrude11_piece_1_1.part)

    add(cut_extrude11_piece_2_1.part)  # Boss-Extrude11 merges Cut-Extrude11 piece 2
    # Sketch35 → Boss-Extrude11 (add)
    with BuildSketch(Plane.XZ.offset(22)):
        with BuildLine():
            Line((33.5, 0), (27.5, 0))
            ThreePointArc((27.5, 0), (48.175, -20.675), (27.5, -41.35))
            Line((27.5, -41.35), (33.5, -41.35))
            Line((33.5, -41.35), (33.5, -43.577087787))
            ThreePointArc((33.5, -43.577087787), (51.175, -20.675), (33.5, 2.227087787))
            Line((33.5, 2.227087787), (33.5, 0))
        make_face()
        with BuildLine():
            Line((33.5, -41.35), (27.5, -41.35))
            Line((27.5, -41.35), (27.5, -44.35))
            ThreePointArc((27.5, -44.35), (30.524788972, -44.155976911), (33.5, -43.577087787))
            Line((33.5, -43.577087787), (33.5, -41.35))
        make_face()
        with BuildLine():
            ThreePointArc((33.5, 2.227087787), (30.524788972, 2.805976911), (27.5, 3))
            Line((27.5, 3), (27.5, 0))
            Line((27.5, 0), (33.5, 0))
            Line((33.5, 0), (33.5, 2.227087787))
        make_face()
    extrude(amount=-BOSS_EXTRUDE11_DEPTH)

    # Sketch39 → Boss-Extrude12 (add, two sides: drawn at the far end of the back side and taken through both)
    with BuildSketch(Plane.XZ.offset(22).offset(-BOSS_EXTRUDE12_DEPTH_BACK)):
        with Locations((49.675, -20.675)):
            Rectangle(SKETCH39_W, SKETCH39_H)
    extrude(amount=BOSS_EXTRUDE12_DEPTH + BOSS_EXTRUDE12_DEPTH_BACK)

    # Fillet10
    # the kernel refuses this fillet: 5 mm, written as the material it adds along each edge
    with BuildSketch(Plane(origin=(50.453553646, 0, -26.475), x_dir=(1, 0, 0), z_dir=(0, -1, 0))) as fillet10_piece_1:
        with BuildLine():
            CenterArc((4.110352594, -3.676318062), FILLET10_R, 132.670504294, 28.031998399)
            Line((-0.608724344, -2.023952227), (-0.703105883, -1.990904911))
            ThreePointArc((-0.703105883, -1.990904911), (-0.377528237, -0.989970671), (-0.096952708, 0.024498416))
            Line((-0.096952708, 0.024498416), (0, 0.1))
            ThreePointArc((0, 0.1), (0.360723177, 0.1), (0.653668229, 0.073526361))
            Line((0.653668229, 0.073526361), (0.721446354, 0))
        make_face()
    extrude(amount=22)
    with BuildSketch(Plane(origin=(50.453553646, 0, -14.875), x_dir=(1, 0, 0), z_dir=(0, -1, 0))) as fillet10_piece_2:
        with BuildLine():
            CenterArc((4.110352594, 3.676318062), FILLET10_R, 199.297497307, 28.031998399)
            Line((-0.608724344, 2.023952227), (-0.703105883, 1.990904911))
            ThreePointArc((-0.703105883, 1.990904911), (-0.377528237, 0.989970671), (-0.096952708, -0.024498416))
            Line((-0.096952708, -0.024498416), (0, -0.1))
            ThreePointArc((0, -0.1), (0.360723177, -0.1), (0.653668229, -0.073526361))
            Line((0.653668229, -0.073526361), (0.721446354, 0))
        make_face()
    extrude(amount=22)

    # Sketch40 → Boss-Extrude13 (add)
    with BuildSketch(Plane(origin=(51.175, 0, 0), x_dir=(0, 0, -1), z_dir=(1, 0, 0))):
        with Locations((15.375, -11)):
            Rectangle(SKETCH40_W, SKETCH40_H)
        with Locations((25.975, -11)):
            Rectangle(SKETCH40_W, SKETCH40_H)
    extrude(amount=BOSS_EXTRUDE13_DEPTH)

    # Sketch42 → Boss-Extrude14 (add)
    with BuildSketch(Plane(origin=(52.875, 0, 0), x_dir=(0, 0, -1), z_dir=(1, 0, 0))):
        with Locations((15.975, -11)):
            Rectangle(SKETCH42_W, SKETCH42_H)
        with Locations((25.375, -11)):
            Rectangle(SKETCH42_W, SKETCH42_H)
    extrude(amount=BOSS_EXTRUDE14_DEPTH)

    # Sketch43 → Boss-Extrude15 (add)
    with BuildSketch(Plane(origin=(0, 21.5, 0), x_dir=(1, 0, 0), z_dir=(0, 1, 0))):
        with Locations((52.025, 20.675)):
            Rectangle(SKETCH43_W, SKETCH43_H)
    extrude(amount=-BOSS_EXTRUDE15_DEPTH)

    # Sketch44 → Boss-Extrude16 (add)
    with BuildSketch(Plane(origin=(0, 21.5, 0), x_dir=(1, 0, 0), z_dir=(0, 1, 0))):
        with Locations((53.375, 20.675)):
            Rectangle(SKETCH44_W, SKETCH44_H)
    extrude(amount=-BOSS_EXTRUDE16_DEPTH)

    # Sketch46 → Cut-Extrude20 (cut)
    with BuildSketch(Plane.ZY.offset(-48.175)):
        with Locations((-20.675, 16)):
            Rectangle(SKETCH46_W, SKETCH46_H)
        with Locations((-20.675, -38.75)):
            Rectangle(SKETCH46_W, SKETCH46_H_2)
    extrude(amount=-CUT_EXTRUDE20_DEPTH, mode=Mode.SUBTRACT)

    # Boss-Extrude17: up to this face of the body (flat: up to its plane)
    boss_extrude17_end = Plane(cut_extrude11_piece_1_2.part.faces().sort_by_distance((51.175, -11.75, -25.019762699))[0])
    # Sketch48 → Boss-Extrude17 (add, up to the picked face)
    with BuildSketch(Plane(origin=(53.875, 0, 0), x_dir=(0, 0, -1), z_dir=(1, 0, 0)), mode=Mode.PRIVATE) as boss_extrude17_sk1:
        with Locations((20.675, 10)):
            Rectangle(SKETCH48_W, SKETCH48_H)
    boss_extrude17_tool1 = split(extrude(boss_extrude17_sk1.sketch, amount=-BOSS_EXTRUDE17_REACH, mode=Mode.PRIVATE), bisect_by=boss_extrude17_end, keep=Keep.BOTH, mode=Mode.PRIVATE)
    add(boss_extrude17_tool1.solids().sort_by(Axis((53.875, 10, -20.675), (-1, 0, 0)))[0])


solid = cut_extrude11_piece_1_2.part
